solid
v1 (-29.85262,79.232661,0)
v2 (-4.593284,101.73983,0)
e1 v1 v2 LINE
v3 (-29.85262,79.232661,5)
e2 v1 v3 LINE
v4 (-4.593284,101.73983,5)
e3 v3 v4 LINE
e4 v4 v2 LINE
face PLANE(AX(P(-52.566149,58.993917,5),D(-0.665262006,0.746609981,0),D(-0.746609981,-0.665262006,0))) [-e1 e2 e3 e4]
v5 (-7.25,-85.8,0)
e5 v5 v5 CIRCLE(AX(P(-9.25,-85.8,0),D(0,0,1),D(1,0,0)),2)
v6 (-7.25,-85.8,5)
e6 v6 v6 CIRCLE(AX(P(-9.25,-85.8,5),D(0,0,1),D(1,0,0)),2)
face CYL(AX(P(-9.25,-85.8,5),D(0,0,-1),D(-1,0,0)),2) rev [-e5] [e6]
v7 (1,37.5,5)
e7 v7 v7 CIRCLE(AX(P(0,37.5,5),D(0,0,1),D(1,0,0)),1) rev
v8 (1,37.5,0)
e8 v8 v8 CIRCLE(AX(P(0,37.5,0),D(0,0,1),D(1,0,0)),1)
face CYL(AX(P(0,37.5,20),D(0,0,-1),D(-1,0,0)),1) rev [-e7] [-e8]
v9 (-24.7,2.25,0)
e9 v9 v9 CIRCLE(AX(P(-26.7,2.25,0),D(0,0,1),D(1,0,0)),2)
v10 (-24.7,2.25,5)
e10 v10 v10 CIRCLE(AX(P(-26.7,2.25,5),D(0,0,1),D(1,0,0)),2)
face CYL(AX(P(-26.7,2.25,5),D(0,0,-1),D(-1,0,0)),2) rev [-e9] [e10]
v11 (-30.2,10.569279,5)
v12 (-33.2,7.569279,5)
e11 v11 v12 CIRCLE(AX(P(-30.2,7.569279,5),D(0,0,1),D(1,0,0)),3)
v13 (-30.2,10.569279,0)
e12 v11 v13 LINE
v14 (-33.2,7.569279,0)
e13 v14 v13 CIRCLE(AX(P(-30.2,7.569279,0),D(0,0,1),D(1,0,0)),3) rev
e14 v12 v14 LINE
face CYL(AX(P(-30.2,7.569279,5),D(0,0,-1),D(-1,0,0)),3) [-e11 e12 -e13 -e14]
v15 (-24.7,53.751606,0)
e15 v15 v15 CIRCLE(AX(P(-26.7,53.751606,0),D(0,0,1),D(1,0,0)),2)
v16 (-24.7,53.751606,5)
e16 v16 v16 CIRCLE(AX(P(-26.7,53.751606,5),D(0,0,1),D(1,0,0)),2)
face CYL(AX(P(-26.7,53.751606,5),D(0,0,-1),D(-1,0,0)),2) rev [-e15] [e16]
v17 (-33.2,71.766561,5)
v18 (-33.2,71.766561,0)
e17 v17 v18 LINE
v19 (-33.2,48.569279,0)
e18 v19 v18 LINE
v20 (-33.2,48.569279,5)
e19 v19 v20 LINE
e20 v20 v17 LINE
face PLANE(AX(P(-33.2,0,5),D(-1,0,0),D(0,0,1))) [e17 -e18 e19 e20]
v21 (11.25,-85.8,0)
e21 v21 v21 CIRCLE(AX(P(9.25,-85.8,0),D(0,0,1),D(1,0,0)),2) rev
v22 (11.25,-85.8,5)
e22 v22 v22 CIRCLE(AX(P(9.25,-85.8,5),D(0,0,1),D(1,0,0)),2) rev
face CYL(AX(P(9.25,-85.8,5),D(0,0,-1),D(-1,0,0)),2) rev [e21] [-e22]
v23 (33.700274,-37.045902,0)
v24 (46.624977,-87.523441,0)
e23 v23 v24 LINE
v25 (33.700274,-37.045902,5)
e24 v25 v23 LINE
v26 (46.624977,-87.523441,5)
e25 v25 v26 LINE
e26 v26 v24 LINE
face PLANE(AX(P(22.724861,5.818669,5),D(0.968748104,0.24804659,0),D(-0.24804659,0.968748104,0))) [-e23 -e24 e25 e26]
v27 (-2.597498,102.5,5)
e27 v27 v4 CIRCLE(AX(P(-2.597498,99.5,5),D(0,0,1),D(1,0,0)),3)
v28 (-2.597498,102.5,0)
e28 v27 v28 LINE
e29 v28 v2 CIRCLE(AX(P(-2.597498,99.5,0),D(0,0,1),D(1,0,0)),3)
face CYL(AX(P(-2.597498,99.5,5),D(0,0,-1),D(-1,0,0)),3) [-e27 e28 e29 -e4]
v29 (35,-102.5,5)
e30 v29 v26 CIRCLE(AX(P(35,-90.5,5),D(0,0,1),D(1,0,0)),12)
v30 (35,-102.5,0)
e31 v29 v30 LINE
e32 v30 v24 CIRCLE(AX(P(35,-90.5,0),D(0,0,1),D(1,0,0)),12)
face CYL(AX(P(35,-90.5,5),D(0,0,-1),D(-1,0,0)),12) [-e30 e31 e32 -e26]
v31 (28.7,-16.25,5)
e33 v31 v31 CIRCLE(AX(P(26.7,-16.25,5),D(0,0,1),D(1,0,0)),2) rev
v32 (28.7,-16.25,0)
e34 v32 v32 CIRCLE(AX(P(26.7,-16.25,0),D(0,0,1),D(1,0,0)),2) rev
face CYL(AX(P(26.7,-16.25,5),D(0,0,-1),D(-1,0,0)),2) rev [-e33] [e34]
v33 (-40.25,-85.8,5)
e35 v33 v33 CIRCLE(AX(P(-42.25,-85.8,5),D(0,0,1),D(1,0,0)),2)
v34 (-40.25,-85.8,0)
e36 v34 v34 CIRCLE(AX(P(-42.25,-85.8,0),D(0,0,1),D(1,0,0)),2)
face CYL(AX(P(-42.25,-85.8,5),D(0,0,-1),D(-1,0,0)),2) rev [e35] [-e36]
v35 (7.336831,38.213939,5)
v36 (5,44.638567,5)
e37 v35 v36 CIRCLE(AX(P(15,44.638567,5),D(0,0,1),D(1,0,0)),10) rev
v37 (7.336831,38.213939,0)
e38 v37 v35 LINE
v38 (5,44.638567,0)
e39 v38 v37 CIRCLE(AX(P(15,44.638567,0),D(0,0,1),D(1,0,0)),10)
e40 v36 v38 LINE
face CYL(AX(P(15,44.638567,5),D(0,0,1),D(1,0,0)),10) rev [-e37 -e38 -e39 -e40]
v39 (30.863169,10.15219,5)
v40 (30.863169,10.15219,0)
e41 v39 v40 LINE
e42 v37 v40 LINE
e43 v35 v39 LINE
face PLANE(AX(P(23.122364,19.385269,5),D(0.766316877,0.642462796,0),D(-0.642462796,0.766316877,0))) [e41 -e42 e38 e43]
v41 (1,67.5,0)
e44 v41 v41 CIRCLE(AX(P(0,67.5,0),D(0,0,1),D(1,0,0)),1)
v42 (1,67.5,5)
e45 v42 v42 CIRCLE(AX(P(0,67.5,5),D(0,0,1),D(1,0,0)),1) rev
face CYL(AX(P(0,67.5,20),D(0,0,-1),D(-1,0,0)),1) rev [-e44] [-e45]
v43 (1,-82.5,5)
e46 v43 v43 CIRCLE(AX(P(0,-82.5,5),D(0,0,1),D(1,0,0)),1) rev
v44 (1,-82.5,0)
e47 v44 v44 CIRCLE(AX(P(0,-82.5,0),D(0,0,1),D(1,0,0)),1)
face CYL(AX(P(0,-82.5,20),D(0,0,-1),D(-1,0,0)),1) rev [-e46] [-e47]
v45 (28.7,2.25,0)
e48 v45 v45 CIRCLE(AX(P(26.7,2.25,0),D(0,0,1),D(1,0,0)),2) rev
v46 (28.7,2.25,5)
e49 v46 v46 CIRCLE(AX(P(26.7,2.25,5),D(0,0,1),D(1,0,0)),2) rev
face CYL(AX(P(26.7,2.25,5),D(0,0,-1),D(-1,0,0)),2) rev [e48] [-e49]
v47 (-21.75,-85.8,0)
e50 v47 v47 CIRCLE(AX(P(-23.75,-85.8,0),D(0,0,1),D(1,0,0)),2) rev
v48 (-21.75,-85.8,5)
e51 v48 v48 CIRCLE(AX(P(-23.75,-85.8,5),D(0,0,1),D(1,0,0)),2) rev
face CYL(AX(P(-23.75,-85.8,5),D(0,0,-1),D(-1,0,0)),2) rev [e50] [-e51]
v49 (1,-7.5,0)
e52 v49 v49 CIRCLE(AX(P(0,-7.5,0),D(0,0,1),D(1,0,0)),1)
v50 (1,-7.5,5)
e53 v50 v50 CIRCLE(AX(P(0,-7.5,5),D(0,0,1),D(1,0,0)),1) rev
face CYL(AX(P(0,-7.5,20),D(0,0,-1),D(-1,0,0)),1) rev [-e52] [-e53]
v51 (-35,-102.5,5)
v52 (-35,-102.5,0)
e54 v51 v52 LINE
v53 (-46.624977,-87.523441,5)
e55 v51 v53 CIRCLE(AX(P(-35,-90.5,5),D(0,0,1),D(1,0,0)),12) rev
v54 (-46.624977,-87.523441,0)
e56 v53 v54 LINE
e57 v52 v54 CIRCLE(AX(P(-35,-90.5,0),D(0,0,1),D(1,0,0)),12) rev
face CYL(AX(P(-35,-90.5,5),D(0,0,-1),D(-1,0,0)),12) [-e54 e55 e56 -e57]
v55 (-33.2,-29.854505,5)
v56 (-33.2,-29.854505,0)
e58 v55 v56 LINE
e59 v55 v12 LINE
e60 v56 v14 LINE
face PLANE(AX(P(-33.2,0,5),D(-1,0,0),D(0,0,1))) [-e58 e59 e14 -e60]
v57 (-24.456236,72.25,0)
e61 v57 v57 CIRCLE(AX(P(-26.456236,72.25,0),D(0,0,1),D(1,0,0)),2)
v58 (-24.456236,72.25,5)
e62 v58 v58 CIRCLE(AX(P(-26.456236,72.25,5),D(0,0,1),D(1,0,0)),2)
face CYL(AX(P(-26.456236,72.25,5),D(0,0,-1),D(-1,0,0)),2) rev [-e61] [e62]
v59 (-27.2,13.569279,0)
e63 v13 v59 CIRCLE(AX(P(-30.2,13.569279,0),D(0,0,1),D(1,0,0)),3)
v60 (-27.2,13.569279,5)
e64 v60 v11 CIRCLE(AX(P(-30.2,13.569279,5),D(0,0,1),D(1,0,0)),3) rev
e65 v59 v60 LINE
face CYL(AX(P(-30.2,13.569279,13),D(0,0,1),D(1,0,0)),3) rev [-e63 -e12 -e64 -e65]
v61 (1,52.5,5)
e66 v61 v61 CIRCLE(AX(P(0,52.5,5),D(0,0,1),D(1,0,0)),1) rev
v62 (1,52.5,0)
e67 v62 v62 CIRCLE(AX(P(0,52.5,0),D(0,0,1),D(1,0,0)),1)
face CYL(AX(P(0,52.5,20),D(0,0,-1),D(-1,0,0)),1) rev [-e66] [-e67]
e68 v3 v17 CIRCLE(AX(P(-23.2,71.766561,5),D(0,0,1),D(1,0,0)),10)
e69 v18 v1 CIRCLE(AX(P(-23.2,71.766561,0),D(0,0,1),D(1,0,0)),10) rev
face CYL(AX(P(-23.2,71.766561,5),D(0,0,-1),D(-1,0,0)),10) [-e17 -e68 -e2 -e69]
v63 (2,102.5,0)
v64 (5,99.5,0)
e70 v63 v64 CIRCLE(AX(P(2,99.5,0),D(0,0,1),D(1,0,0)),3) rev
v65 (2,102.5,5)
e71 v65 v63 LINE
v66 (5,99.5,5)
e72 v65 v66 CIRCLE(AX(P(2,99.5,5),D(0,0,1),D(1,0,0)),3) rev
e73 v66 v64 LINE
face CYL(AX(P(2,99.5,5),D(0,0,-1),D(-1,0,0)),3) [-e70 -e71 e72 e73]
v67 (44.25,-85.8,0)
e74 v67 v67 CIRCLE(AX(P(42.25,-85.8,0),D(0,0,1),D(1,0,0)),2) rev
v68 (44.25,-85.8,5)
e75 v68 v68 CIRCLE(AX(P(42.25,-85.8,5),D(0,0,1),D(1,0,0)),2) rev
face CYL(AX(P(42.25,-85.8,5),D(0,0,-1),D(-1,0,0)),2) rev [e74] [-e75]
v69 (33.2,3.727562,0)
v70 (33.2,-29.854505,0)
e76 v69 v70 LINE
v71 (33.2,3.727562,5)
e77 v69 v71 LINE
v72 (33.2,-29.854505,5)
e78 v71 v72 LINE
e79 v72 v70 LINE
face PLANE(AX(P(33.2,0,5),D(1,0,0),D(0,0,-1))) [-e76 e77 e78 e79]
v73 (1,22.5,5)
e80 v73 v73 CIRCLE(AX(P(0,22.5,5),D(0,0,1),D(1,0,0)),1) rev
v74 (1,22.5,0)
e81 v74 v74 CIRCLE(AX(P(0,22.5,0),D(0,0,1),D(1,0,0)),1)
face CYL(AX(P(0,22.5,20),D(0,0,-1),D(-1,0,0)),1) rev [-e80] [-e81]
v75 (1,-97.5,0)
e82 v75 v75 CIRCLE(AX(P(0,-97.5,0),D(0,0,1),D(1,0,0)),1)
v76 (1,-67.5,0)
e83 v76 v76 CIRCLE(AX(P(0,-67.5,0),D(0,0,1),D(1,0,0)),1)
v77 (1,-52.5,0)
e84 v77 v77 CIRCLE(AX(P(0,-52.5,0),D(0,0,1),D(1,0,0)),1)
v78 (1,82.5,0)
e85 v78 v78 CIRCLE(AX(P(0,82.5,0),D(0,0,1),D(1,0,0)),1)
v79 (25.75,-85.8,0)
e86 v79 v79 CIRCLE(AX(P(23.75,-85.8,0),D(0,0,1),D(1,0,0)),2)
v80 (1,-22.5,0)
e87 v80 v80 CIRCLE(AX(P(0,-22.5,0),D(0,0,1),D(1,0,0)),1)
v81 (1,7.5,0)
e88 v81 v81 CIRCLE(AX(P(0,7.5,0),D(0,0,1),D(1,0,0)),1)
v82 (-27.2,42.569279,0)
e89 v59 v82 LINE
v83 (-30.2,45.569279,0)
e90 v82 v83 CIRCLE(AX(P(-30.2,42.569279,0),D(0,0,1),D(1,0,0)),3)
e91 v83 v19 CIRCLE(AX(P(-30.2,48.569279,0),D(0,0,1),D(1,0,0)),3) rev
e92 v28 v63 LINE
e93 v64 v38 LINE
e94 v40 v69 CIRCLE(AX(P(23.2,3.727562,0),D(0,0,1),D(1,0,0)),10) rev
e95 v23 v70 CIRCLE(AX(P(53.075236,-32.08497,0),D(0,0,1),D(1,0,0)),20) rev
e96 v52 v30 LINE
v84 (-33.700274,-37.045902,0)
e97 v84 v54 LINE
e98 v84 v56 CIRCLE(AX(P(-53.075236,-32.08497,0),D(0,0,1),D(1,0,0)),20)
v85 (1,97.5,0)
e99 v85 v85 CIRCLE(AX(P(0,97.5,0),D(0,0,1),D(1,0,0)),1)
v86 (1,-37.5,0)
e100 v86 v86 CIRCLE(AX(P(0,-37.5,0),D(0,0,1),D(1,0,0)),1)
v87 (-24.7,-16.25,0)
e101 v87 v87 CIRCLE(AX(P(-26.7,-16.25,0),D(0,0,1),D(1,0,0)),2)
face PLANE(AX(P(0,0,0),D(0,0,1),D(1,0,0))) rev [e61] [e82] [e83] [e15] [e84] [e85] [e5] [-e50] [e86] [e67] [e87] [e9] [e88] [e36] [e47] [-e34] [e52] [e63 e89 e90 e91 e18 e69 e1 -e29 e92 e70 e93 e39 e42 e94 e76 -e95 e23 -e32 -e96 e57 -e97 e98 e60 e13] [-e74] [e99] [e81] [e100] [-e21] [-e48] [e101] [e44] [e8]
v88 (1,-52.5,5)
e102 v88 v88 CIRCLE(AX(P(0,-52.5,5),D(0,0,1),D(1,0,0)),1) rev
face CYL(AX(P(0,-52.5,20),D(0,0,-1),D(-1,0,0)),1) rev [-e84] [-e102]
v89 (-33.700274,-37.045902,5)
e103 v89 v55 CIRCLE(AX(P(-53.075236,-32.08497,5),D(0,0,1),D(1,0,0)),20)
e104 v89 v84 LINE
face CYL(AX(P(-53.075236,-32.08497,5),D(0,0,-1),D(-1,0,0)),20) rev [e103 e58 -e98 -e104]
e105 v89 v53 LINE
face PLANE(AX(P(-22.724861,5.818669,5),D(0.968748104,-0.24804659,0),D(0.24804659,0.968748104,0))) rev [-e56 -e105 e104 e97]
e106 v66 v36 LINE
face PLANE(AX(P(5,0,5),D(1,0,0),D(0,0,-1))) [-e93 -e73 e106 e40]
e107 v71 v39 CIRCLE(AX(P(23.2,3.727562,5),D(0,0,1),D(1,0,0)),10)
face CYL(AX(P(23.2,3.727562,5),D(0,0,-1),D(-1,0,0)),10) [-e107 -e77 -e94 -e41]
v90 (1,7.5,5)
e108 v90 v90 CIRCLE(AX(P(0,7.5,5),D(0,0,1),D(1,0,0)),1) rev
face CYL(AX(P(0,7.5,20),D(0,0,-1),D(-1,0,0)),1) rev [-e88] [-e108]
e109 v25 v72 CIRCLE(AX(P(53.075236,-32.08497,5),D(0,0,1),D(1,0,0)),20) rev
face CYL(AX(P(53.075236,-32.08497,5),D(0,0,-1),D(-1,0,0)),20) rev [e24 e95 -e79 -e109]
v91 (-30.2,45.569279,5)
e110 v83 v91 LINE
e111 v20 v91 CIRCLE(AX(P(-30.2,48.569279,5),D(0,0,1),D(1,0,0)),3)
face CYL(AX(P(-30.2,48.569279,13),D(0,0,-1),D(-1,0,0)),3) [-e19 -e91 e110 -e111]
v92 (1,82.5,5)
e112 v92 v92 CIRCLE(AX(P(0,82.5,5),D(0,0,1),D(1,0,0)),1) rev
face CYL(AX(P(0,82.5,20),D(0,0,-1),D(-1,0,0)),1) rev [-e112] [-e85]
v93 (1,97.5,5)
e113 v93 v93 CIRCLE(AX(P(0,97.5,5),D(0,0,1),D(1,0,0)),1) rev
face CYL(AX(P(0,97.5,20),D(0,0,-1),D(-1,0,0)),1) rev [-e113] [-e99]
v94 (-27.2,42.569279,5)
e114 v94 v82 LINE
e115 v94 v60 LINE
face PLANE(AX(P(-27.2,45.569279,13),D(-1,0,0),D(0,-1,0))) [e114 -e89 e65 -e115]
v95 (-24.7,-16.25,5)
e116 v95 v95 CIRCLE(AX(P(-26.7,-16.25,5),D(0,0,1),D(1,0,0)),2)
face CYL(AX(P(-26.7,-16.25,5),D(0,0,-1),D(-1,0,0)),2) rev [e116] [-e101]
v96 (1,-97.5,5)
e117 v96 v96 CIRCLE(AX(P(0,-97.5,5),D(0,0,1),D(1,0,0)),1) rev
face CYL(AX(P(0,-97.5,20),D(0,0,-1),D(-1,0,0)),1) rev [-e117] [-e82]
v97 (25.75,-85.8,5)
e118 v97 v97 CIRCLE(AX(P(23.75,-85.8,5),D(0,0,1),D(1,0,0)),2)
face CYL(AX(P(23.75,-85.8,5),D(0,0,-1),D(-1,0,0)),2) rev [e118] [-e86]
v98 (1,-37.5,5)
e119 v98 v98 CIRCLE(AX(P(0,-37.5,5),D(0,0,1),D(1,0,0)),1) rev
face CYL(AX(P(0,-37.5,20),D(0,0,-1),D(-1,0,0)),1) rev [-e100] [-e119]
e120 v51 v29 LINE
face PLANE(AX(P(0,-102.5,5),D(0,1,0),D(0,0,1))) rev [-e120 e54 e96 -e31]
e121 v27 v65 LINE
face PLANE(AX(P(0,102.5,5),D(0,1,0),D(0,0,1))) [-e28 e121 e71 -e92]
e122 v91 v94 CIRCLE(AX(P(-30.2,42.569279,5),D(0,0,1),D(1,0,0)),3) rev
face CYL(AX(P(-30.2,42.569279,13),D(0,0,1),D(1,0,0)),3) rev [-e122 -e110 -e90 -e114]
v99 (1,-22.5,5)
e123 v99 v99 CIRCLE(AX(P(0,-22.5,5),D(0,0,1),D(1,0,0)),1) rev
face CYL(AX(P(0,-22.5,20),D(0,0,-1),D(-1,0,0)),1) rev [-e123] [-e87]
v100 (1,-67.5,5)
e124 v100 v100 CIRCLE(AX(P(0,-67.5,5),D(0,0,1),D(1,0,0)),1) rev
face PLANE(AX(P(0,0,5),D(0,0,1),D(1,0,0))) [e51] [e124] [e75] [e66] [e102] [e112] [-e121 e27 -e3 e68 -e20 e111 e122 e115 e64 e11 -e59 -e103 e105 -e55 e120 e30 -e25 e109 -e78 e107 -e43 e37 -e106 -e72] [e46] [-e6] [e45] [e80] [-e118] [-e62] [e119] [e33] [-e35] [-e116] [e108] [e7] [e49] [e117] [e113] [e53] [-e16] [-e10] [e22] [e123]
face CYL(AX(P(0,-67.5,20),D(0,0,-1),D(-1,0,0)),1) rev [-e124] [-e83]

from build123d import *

# Parameters (mm, degrees)
SKETCH_1_R             = 2
EXTRUDE_1_DEPTH        = 5
SKETCH_2_R             = 1
CUT_EXTRUDE_1_DEPTH    = 20
PATTERN_LINEAR_1_COUNT = 14
PATTERN_LINEAR_1_PITCH = 15
FILLET_1_R             = 10
SKETCH_3_W             = 6
SKETCH_3_H             = 35
CUT_EXTRUDE_2_DEPTH    = 13
FILLET_2_R             = 3


with BuildPart() as part:
    # 草图1 → 凸台-拉伸1 (new body)
    # profile 1 of 4: a face of its own
    with BuildSketch(Plane.XY):
        with BuildLine():
            ThreePointArc((-33.2, -29.85450543), (-33.123455397, -33.472929676), (-33.700274419, -37.045902236))
            Line((-33.700274419, -37.045902236), (-46.624977248, -87.523440915))
            ThreePointArc((-46.624977248, -87.523440915), (-44.479417414, -97.858032719), (-35, -102.5))
            Line((-35, -102.5), (-5, -102.5))
            Line((-5, -102.5), (5, -102.5))
            Line((5, -102.5), (35, -102.5))
            ThreePointArc((35, -102.5), (44.479417414, -97.858032719), (46.624977248, -87.523440915))
            Line((46.624977248, -87.523440915), (33.700274419, -37.045902236))
            ThreePointArc((33.700274419, -37.045902236), (33.123455397, -33.472929676), (33.2, -29.85450543))
            Line((33.2, -29.85450543), (33.2, 7.364864087))
            Line((33.2, 7.364864087), (5, 41.001264624))
            Line((5, 41.001264624), (5, 99.5))
            ThreePointArc((5, 99.5), (4.121320344, 101.621320344), (2, 102.5))
            Line((2, 102.5), (-2.597497695, 102.5))
            ThreePointArc((-2.597497695, 102.5), (-3.665324968, 102.30352366), (-4.593283712, 101.739829943))
            Line((-4.593283712, 101.739829943), (-33.2, 76.25))
            Line((-33.2, 76.25), (-33.2, -29.85450543))
        make_face()
        with Locations((-42.25, -85.8)):
            Circle(SKETCH_1_R, mode=Mode.SUBTRACT)
        with Locations((-23.75, -85.8)):
            Circle(SKETCH_1_R, mode=Mode.SUBTRACT)
        with Locations((-9.25, -85.8)):
            Circle(SKETCH_1_R, mode=Mode.SUBTRACT)
        with Locations((-26.7, -16.25)):
            Circle(SKETCH_1_R, mode=Mode.SUBTRACT)
        with Locations((9.25, -85.8)):
            Circle(SKETCH_1_R, mode=Mode.SUBTRACT)
        with Locations((23.75, -85.8)):
            Circle(SKETCH_1_R, mode=Mode.SUBTRACT)
        with Locations((42.25, -85.8)):
            Circle(SKETCH_1_R, mode=Mode.SUBTRACT)
        with Locations((26.7, -16.25)):
            Circle(SKETCH_1_R, mode=Mode.SUBTRACT)
        with Locations((-26.7, 2.25)):
            Circle(SKETCH_1_R, mode=Mode.SUBTRACT)
        with Locations((-26.7, 53.751606034)):
            Circle(SKETCH_1_R, mode=Mode.SUBTRACT)
        with Locations((-26.45623641, 72.25)):
            Circle(SKETCH_1_R, mode=Mode.SUBTRACT)
        with Locations((26.7, 2.25)):
            Circle(SKETCH_1_R, mode=Mode.SUBTRACT)
    # profile 2 of 4: a face of its own
    with BuildSketch(Plane.XY):
        with BuildLine():
            ThreePointArc((-33.2, -29.85450543), (-33.123455397, -33.472929676), (-33.700274419, -37.045902236))
            Line((-33.700274419, -37.045902236), (-46.624977248, -87.523440915))
            ThreePointArc((-46.624977248, -87.523440915), (-44.479417414, -97.858032719), (-35, -102.5))
            Line((-35, -102.5), (-5, -102.5))
            Line((-5, -102.5), (5, -102.5))
            Line((5, -102.5), (35, -102.5))
            ThreePointArc((35, -102.5), (44.479417414, -97.858032719), (46.624977248, -87.523440915))
            Line((46.624977248, -87.523440915), (33.700274419, -37.045902236))
            ThreePointArc((33.700274419, -37.045902236), (33.123455397, -33.472929676), (33.2, -29.85450543))
            Line((33.2, -29.85450543), (33.2, 7.364864087))
            Line((33.2, 7.364864087), (5, 41.001264624))
            Line((5, 41.001264624), (5, 99.5))
            ThreePointArc((5, 99.5), (4.121320344, 101.621320344), (2, 102.5))
            Line((2, 102.5), (-2.597497695, 102.5))
            ThreePointArc((-2.597497695, 102.5), (-3.665324968, 102.30352366), (-4.593283712, 101.739829943))
            Line((-4.593283712, 101.739829943), (-33.2, 76.25))
            Line((-33.2, 76.25), (-33.2, -29.85450543))
        make_face()
        with Locations((-42.25, -85.8)):
            Circle(SKETCH_1_R, mode=Mode.SUBTRACT)
        with Locations((-23.75, -85.8)):
            Circle(SKETCH_1_R, mode=Mode.SUBTRACT)
        with Locations((-9.25, -85.8)):
            Circle(SKETCH_1_R, mode=Mode.SUBTRACT)
        with Locations((-26.7, -16.25)):
            Circle(SKETCH_1_R, mode=Mode.SUBTRACT)
        with Locations((9.25, -85.8)):
            Circle(SKETCH_1_R, mode=Mode.SUBTRACT)
        with Locations((23.75, -85.8)):
            Circle(SKETCH_1_R, mode=Mode.SUBTRACT)
        with Locations((42.25, -85.8)):
            Circle(SKETCH_1_R, mode=Mode.SUBTRACT)
        with Locations((26.7, -16.25)):
            Circle(SKETCH_1_R, mode=Mode.SUBTRACT)
        with Locations((-26.7, 2.25)):
            Circle(SKETCH_1_R, mode=Mode.SUBTRACT)
        with Locations((-26.7, 53.751606034)):
            Circle(SKETCH_1_R, mode=Mode.SUBTRACT)
        with Locations((-26.45623641, 72.25)):
            Circle(SKETCH_1_R, mode=Mode.SUBTRACT)
        with Locations((26.7, 2.25)):
            Circle(SKETCH_1_R, mode=Mode.SUBTRACT)
    # profile 3 of 4: a face of its own
    with BuildSketch(Plane.XY):
        with BuildLine():
            ThreePointArc((-33.2, -29.85450543), (-33.123455397, -33.472929676), (-33.700274419, -37.045902236))
            Line((-33.700274419, -37.045902236), (-46.624977248, -87.523440915))
            ThreePointArc((-46.624977248, -87.523440915), (-44.479417414, -97.858032719), (-35, -102.5))
            Line((-35, -102.5), (-5, -102.5))
            Line((-5, -102.5), (5, -102.5))
            Line((5, -102.5), (35, -102.5))
            ThreePointArc((35, -102.5), (44.479417414, -97.858032719), (46.624977248, -87.523440915))
            Line((46.624977248, -87.523440915), (33.700274419, -37.045902236))
            ThreePointArc((33.700274419, -37.045902236), (33.123455397, -33.472929676), (33.2, -29.85450543))
            Line((33.2, -29.85450543), (33.2, 7.364864087))
            Line((33.2, 7.364864087), (5, 41.001264624))
            Line((5, 41.001264624), (5, 99.5))
            ThreePointArc((5, 99.5), (4.121320344, 101.621320344), (2, 102.5))
            Line((2, 102.5), (-2.597497695, 102.5))
            ThreePointArc((-2.597497695, 102.5), (-3.665324968, 102.30352366), (-4.593283712, 101.739829943))
            Line((-4.593283712, 101.739829943), (-33.2, 76.25))
            Line((-33.2, 76.25), (-33.2, -29.85450543))
        make_face()
        with Locations((-42.25, -85.8)):
            Circle(SKETCH_1_R, mode=Mode.SUBTRACT)
        with Locations((-23.75, -85.8)):
            Circle(SKETCH_1_R, mode=Mode.SUBTRACT)
        with Locations((-9.25, -85.8)):
            Circle(SKETCH_1_R, mode=Mode.SUBTRACT)
        with Locations((-26.7, -16.25)):
            Circle(SKETCH_1_R, mode=Mode.SUBTRACT)
        with Locations((9.25, -85.8)):
            Circle(SKETCH_1_R, mode=Mode.SUBTRACT)
        with Locations((23.75, -85.8)):
            Circle(SKETCH_1_R, mode=Mode.SUBTRACT)
        with Locations((42.25, -85.8)):
            Circle(SKETCH_1_R, mode=Mode.SUBTRACT)
        with Locations((26.7, -16.25)):
            Circle(SKETCH_1_R, mode=Mode.SUBTRACT)
        with Locations((-26.7, 2.25)):
            Circle(SKETCH_1_R, mode=Mode.SUBTRACT)
        with Locations((-26.7, 53.751606034)):
            Circle(SKETCH_1_R, mode=Mode.SUBTRACT)
        with Locations((-26.45623641, 72.25)):
            Circle(SKETCH_1_R, mode=Mode.SUBTRACT)
        with Locations((26.7, 2.25)):
            Circle(SKETCH_1_R, mode=Mode.SUBTRACT)
    # profile 4 of 4: a face of its own
    with BuildSketch(Plane.XY):
        with BuildLine():
            ThreePointArc((-33.2, -29.85450543), (-33.123455397, -33.472929676), (-33.700274419, -37.045902236))
            Line((-33.700274419, -37.045902236), (-46.624977248, -87.523440915))
            ThreePointArc((-46.624977248, -87.523440915), (-44.479417414, -97.858032719), (-35, -102.5))
            Line((-35, -102.5), (-5, -102.5))
            Line((-5, -102.5), (5, -102.5))
            Line((5, -102.5), (35, -102.5))
            ThreePointArc((35, -102.5), (44.479417414, -97.858032719), (46.624977248, -87.523440915))
            Line((46.624977248, -87.523440915), (33.700274419, -37.045902236))
            ThreePointArc((33.700274419, -37.045902236), (33.123455397, -33.472929676), (33.2, -29.85450543))
            Line((33.2, -29.85450543), (33.2, 7.364864087))
            Line((33.2, 7.364864087), (5, 41.001264624))
            Line((5, 41.001264624), (5, 99.5))
            ThreePointArc((5, 99.5), (4.121320344, 101.621320344), (2, 102.5))
            Line((2, 102.5), (-2.597497695, 102.5))
            ThreePointArc((-2.597497695, 102.5), (-3.665324968, 102.30352366), (-4.593283712, 101.739829943))
            Line((-4.593283712, 101.739829943), (-33.2, 76.25))
            Line((-33.2, 76.25), (-33.2, -29.85450543))
        make_face()
        with Locations((-42.25, -85.8)):
            Circle(SKETCH_1_R, mode=Mode.SUBTRACT)
        with Locations((-23.75, -85.8)):
            Circle(SKETCH_1_R, mode=Mode.SUBTRACT)
        with Locations((-9.25, -85.8)):
            Circle(SKETCH_1_R, mode=Mode.SUBTRACT)
        with Locations((-26.7, -16.25)):
            Circle(SKETCH_1_R, mode=Mode.SUBTRACT)
        with Locations((9.25, -85.8)):
            Circle(SKETCH_1_R, mode=Mode.SUBTRACT)
        with Locations((23.75, -85.8)):
            Circle(SKETCH_1_R, mode=Mode.SUBTRACT)
        with Locations((42.25, -85.8)):
            Circle(SKETCH_1_R, mode=Mode.SUBTRACT)
        with Locations((26.7, -16.25)):
            Circle(SKETCH_1_R, mode=Mode.SUBTRACT)
        with Locations((-26.7, 2.25)):
            Circle(SKETCH_1_R, mode=Mode.SUBTRACT)
        with Locations((-26.7, 53.751606034)):
            Circle(SKETCH_1_R, mode=Mode.SUBTRACT)
        with Locations((-26.45623641, 72.25)):
            Circle(SKETCH_1_R, mode=Mode.SUBTRACT)
        with Locations((26.7, 2.25)):
            Circle(SKETCH_1_R, mode=Mode.SUBTRACT)
    extrude(amount=EXTRUDE_1_DEPTH)

    # 草图2 → 切除-拉伸1 (cut)
    with BuildSketch(Plane.XY):
        with Locations((0, 97.5)):
            Circle(SKETCH_2_R)
    cut_extrude_1 = extrude(amount=CUT_EXTRUDE_1_DEPTH, mode=Mode.SUBTRACT)

    # 阵列(线性)1: 切除-拉伸1 ×14
    with Locations(*[(0, -i * PATTERN_LINEAR_1_PITCH, 0) for i in range(1, PATTERN_LINEAR_1_COUNT)]):
        add(cut_extrude_1, mode=Mode.SUBTRACT)

    # 圆角1
    fillet_1_edges = [part.edges().sort_by_distance(p)[0] for p in [
        (-33.2, 76.25, 2.5),
        (5, 41.001264624, 2.5),
        (33.2, 7.364864087, 2.5),
    ]]
    fillet(fillet_1_edges, radius=FILLET_1_R)

    # 草图3 → 切除-拉伸2 (cut)
    with BuildSketch(Plane.XY):
        with Locations((-30.2, 28.069279085)):
            Rectangle(SKETCH_3_W, SKETCH_3_H)
    extrude(amount=CUT_EXTRUDE_2_DEPTH, mode=Mode.SUBTRACT)

    # 圆角2
    fillet_2_edges = [part.edges().sort_by_distance(p)[0] for p in [
        (-27.2, 45.569279085, 2.5),
        (-27.2, 10.569279085, 2.5),
    ]]
    fillet(fillet_2_edges, radius=FILLET_2_R)
    fillet_2_2_edges = [part.edges().sort_by_distance(p)[0] for p in [
        (-33.2, 45.569279085, 2.5),
        (-33.2, 10.569279085, 2.5),
    ]]
    fillet(fillet_2_2_edges, radius=FILLET_2_R - 0.0001)  # a hair under: the kernel refuses the full size


solid = part.part
